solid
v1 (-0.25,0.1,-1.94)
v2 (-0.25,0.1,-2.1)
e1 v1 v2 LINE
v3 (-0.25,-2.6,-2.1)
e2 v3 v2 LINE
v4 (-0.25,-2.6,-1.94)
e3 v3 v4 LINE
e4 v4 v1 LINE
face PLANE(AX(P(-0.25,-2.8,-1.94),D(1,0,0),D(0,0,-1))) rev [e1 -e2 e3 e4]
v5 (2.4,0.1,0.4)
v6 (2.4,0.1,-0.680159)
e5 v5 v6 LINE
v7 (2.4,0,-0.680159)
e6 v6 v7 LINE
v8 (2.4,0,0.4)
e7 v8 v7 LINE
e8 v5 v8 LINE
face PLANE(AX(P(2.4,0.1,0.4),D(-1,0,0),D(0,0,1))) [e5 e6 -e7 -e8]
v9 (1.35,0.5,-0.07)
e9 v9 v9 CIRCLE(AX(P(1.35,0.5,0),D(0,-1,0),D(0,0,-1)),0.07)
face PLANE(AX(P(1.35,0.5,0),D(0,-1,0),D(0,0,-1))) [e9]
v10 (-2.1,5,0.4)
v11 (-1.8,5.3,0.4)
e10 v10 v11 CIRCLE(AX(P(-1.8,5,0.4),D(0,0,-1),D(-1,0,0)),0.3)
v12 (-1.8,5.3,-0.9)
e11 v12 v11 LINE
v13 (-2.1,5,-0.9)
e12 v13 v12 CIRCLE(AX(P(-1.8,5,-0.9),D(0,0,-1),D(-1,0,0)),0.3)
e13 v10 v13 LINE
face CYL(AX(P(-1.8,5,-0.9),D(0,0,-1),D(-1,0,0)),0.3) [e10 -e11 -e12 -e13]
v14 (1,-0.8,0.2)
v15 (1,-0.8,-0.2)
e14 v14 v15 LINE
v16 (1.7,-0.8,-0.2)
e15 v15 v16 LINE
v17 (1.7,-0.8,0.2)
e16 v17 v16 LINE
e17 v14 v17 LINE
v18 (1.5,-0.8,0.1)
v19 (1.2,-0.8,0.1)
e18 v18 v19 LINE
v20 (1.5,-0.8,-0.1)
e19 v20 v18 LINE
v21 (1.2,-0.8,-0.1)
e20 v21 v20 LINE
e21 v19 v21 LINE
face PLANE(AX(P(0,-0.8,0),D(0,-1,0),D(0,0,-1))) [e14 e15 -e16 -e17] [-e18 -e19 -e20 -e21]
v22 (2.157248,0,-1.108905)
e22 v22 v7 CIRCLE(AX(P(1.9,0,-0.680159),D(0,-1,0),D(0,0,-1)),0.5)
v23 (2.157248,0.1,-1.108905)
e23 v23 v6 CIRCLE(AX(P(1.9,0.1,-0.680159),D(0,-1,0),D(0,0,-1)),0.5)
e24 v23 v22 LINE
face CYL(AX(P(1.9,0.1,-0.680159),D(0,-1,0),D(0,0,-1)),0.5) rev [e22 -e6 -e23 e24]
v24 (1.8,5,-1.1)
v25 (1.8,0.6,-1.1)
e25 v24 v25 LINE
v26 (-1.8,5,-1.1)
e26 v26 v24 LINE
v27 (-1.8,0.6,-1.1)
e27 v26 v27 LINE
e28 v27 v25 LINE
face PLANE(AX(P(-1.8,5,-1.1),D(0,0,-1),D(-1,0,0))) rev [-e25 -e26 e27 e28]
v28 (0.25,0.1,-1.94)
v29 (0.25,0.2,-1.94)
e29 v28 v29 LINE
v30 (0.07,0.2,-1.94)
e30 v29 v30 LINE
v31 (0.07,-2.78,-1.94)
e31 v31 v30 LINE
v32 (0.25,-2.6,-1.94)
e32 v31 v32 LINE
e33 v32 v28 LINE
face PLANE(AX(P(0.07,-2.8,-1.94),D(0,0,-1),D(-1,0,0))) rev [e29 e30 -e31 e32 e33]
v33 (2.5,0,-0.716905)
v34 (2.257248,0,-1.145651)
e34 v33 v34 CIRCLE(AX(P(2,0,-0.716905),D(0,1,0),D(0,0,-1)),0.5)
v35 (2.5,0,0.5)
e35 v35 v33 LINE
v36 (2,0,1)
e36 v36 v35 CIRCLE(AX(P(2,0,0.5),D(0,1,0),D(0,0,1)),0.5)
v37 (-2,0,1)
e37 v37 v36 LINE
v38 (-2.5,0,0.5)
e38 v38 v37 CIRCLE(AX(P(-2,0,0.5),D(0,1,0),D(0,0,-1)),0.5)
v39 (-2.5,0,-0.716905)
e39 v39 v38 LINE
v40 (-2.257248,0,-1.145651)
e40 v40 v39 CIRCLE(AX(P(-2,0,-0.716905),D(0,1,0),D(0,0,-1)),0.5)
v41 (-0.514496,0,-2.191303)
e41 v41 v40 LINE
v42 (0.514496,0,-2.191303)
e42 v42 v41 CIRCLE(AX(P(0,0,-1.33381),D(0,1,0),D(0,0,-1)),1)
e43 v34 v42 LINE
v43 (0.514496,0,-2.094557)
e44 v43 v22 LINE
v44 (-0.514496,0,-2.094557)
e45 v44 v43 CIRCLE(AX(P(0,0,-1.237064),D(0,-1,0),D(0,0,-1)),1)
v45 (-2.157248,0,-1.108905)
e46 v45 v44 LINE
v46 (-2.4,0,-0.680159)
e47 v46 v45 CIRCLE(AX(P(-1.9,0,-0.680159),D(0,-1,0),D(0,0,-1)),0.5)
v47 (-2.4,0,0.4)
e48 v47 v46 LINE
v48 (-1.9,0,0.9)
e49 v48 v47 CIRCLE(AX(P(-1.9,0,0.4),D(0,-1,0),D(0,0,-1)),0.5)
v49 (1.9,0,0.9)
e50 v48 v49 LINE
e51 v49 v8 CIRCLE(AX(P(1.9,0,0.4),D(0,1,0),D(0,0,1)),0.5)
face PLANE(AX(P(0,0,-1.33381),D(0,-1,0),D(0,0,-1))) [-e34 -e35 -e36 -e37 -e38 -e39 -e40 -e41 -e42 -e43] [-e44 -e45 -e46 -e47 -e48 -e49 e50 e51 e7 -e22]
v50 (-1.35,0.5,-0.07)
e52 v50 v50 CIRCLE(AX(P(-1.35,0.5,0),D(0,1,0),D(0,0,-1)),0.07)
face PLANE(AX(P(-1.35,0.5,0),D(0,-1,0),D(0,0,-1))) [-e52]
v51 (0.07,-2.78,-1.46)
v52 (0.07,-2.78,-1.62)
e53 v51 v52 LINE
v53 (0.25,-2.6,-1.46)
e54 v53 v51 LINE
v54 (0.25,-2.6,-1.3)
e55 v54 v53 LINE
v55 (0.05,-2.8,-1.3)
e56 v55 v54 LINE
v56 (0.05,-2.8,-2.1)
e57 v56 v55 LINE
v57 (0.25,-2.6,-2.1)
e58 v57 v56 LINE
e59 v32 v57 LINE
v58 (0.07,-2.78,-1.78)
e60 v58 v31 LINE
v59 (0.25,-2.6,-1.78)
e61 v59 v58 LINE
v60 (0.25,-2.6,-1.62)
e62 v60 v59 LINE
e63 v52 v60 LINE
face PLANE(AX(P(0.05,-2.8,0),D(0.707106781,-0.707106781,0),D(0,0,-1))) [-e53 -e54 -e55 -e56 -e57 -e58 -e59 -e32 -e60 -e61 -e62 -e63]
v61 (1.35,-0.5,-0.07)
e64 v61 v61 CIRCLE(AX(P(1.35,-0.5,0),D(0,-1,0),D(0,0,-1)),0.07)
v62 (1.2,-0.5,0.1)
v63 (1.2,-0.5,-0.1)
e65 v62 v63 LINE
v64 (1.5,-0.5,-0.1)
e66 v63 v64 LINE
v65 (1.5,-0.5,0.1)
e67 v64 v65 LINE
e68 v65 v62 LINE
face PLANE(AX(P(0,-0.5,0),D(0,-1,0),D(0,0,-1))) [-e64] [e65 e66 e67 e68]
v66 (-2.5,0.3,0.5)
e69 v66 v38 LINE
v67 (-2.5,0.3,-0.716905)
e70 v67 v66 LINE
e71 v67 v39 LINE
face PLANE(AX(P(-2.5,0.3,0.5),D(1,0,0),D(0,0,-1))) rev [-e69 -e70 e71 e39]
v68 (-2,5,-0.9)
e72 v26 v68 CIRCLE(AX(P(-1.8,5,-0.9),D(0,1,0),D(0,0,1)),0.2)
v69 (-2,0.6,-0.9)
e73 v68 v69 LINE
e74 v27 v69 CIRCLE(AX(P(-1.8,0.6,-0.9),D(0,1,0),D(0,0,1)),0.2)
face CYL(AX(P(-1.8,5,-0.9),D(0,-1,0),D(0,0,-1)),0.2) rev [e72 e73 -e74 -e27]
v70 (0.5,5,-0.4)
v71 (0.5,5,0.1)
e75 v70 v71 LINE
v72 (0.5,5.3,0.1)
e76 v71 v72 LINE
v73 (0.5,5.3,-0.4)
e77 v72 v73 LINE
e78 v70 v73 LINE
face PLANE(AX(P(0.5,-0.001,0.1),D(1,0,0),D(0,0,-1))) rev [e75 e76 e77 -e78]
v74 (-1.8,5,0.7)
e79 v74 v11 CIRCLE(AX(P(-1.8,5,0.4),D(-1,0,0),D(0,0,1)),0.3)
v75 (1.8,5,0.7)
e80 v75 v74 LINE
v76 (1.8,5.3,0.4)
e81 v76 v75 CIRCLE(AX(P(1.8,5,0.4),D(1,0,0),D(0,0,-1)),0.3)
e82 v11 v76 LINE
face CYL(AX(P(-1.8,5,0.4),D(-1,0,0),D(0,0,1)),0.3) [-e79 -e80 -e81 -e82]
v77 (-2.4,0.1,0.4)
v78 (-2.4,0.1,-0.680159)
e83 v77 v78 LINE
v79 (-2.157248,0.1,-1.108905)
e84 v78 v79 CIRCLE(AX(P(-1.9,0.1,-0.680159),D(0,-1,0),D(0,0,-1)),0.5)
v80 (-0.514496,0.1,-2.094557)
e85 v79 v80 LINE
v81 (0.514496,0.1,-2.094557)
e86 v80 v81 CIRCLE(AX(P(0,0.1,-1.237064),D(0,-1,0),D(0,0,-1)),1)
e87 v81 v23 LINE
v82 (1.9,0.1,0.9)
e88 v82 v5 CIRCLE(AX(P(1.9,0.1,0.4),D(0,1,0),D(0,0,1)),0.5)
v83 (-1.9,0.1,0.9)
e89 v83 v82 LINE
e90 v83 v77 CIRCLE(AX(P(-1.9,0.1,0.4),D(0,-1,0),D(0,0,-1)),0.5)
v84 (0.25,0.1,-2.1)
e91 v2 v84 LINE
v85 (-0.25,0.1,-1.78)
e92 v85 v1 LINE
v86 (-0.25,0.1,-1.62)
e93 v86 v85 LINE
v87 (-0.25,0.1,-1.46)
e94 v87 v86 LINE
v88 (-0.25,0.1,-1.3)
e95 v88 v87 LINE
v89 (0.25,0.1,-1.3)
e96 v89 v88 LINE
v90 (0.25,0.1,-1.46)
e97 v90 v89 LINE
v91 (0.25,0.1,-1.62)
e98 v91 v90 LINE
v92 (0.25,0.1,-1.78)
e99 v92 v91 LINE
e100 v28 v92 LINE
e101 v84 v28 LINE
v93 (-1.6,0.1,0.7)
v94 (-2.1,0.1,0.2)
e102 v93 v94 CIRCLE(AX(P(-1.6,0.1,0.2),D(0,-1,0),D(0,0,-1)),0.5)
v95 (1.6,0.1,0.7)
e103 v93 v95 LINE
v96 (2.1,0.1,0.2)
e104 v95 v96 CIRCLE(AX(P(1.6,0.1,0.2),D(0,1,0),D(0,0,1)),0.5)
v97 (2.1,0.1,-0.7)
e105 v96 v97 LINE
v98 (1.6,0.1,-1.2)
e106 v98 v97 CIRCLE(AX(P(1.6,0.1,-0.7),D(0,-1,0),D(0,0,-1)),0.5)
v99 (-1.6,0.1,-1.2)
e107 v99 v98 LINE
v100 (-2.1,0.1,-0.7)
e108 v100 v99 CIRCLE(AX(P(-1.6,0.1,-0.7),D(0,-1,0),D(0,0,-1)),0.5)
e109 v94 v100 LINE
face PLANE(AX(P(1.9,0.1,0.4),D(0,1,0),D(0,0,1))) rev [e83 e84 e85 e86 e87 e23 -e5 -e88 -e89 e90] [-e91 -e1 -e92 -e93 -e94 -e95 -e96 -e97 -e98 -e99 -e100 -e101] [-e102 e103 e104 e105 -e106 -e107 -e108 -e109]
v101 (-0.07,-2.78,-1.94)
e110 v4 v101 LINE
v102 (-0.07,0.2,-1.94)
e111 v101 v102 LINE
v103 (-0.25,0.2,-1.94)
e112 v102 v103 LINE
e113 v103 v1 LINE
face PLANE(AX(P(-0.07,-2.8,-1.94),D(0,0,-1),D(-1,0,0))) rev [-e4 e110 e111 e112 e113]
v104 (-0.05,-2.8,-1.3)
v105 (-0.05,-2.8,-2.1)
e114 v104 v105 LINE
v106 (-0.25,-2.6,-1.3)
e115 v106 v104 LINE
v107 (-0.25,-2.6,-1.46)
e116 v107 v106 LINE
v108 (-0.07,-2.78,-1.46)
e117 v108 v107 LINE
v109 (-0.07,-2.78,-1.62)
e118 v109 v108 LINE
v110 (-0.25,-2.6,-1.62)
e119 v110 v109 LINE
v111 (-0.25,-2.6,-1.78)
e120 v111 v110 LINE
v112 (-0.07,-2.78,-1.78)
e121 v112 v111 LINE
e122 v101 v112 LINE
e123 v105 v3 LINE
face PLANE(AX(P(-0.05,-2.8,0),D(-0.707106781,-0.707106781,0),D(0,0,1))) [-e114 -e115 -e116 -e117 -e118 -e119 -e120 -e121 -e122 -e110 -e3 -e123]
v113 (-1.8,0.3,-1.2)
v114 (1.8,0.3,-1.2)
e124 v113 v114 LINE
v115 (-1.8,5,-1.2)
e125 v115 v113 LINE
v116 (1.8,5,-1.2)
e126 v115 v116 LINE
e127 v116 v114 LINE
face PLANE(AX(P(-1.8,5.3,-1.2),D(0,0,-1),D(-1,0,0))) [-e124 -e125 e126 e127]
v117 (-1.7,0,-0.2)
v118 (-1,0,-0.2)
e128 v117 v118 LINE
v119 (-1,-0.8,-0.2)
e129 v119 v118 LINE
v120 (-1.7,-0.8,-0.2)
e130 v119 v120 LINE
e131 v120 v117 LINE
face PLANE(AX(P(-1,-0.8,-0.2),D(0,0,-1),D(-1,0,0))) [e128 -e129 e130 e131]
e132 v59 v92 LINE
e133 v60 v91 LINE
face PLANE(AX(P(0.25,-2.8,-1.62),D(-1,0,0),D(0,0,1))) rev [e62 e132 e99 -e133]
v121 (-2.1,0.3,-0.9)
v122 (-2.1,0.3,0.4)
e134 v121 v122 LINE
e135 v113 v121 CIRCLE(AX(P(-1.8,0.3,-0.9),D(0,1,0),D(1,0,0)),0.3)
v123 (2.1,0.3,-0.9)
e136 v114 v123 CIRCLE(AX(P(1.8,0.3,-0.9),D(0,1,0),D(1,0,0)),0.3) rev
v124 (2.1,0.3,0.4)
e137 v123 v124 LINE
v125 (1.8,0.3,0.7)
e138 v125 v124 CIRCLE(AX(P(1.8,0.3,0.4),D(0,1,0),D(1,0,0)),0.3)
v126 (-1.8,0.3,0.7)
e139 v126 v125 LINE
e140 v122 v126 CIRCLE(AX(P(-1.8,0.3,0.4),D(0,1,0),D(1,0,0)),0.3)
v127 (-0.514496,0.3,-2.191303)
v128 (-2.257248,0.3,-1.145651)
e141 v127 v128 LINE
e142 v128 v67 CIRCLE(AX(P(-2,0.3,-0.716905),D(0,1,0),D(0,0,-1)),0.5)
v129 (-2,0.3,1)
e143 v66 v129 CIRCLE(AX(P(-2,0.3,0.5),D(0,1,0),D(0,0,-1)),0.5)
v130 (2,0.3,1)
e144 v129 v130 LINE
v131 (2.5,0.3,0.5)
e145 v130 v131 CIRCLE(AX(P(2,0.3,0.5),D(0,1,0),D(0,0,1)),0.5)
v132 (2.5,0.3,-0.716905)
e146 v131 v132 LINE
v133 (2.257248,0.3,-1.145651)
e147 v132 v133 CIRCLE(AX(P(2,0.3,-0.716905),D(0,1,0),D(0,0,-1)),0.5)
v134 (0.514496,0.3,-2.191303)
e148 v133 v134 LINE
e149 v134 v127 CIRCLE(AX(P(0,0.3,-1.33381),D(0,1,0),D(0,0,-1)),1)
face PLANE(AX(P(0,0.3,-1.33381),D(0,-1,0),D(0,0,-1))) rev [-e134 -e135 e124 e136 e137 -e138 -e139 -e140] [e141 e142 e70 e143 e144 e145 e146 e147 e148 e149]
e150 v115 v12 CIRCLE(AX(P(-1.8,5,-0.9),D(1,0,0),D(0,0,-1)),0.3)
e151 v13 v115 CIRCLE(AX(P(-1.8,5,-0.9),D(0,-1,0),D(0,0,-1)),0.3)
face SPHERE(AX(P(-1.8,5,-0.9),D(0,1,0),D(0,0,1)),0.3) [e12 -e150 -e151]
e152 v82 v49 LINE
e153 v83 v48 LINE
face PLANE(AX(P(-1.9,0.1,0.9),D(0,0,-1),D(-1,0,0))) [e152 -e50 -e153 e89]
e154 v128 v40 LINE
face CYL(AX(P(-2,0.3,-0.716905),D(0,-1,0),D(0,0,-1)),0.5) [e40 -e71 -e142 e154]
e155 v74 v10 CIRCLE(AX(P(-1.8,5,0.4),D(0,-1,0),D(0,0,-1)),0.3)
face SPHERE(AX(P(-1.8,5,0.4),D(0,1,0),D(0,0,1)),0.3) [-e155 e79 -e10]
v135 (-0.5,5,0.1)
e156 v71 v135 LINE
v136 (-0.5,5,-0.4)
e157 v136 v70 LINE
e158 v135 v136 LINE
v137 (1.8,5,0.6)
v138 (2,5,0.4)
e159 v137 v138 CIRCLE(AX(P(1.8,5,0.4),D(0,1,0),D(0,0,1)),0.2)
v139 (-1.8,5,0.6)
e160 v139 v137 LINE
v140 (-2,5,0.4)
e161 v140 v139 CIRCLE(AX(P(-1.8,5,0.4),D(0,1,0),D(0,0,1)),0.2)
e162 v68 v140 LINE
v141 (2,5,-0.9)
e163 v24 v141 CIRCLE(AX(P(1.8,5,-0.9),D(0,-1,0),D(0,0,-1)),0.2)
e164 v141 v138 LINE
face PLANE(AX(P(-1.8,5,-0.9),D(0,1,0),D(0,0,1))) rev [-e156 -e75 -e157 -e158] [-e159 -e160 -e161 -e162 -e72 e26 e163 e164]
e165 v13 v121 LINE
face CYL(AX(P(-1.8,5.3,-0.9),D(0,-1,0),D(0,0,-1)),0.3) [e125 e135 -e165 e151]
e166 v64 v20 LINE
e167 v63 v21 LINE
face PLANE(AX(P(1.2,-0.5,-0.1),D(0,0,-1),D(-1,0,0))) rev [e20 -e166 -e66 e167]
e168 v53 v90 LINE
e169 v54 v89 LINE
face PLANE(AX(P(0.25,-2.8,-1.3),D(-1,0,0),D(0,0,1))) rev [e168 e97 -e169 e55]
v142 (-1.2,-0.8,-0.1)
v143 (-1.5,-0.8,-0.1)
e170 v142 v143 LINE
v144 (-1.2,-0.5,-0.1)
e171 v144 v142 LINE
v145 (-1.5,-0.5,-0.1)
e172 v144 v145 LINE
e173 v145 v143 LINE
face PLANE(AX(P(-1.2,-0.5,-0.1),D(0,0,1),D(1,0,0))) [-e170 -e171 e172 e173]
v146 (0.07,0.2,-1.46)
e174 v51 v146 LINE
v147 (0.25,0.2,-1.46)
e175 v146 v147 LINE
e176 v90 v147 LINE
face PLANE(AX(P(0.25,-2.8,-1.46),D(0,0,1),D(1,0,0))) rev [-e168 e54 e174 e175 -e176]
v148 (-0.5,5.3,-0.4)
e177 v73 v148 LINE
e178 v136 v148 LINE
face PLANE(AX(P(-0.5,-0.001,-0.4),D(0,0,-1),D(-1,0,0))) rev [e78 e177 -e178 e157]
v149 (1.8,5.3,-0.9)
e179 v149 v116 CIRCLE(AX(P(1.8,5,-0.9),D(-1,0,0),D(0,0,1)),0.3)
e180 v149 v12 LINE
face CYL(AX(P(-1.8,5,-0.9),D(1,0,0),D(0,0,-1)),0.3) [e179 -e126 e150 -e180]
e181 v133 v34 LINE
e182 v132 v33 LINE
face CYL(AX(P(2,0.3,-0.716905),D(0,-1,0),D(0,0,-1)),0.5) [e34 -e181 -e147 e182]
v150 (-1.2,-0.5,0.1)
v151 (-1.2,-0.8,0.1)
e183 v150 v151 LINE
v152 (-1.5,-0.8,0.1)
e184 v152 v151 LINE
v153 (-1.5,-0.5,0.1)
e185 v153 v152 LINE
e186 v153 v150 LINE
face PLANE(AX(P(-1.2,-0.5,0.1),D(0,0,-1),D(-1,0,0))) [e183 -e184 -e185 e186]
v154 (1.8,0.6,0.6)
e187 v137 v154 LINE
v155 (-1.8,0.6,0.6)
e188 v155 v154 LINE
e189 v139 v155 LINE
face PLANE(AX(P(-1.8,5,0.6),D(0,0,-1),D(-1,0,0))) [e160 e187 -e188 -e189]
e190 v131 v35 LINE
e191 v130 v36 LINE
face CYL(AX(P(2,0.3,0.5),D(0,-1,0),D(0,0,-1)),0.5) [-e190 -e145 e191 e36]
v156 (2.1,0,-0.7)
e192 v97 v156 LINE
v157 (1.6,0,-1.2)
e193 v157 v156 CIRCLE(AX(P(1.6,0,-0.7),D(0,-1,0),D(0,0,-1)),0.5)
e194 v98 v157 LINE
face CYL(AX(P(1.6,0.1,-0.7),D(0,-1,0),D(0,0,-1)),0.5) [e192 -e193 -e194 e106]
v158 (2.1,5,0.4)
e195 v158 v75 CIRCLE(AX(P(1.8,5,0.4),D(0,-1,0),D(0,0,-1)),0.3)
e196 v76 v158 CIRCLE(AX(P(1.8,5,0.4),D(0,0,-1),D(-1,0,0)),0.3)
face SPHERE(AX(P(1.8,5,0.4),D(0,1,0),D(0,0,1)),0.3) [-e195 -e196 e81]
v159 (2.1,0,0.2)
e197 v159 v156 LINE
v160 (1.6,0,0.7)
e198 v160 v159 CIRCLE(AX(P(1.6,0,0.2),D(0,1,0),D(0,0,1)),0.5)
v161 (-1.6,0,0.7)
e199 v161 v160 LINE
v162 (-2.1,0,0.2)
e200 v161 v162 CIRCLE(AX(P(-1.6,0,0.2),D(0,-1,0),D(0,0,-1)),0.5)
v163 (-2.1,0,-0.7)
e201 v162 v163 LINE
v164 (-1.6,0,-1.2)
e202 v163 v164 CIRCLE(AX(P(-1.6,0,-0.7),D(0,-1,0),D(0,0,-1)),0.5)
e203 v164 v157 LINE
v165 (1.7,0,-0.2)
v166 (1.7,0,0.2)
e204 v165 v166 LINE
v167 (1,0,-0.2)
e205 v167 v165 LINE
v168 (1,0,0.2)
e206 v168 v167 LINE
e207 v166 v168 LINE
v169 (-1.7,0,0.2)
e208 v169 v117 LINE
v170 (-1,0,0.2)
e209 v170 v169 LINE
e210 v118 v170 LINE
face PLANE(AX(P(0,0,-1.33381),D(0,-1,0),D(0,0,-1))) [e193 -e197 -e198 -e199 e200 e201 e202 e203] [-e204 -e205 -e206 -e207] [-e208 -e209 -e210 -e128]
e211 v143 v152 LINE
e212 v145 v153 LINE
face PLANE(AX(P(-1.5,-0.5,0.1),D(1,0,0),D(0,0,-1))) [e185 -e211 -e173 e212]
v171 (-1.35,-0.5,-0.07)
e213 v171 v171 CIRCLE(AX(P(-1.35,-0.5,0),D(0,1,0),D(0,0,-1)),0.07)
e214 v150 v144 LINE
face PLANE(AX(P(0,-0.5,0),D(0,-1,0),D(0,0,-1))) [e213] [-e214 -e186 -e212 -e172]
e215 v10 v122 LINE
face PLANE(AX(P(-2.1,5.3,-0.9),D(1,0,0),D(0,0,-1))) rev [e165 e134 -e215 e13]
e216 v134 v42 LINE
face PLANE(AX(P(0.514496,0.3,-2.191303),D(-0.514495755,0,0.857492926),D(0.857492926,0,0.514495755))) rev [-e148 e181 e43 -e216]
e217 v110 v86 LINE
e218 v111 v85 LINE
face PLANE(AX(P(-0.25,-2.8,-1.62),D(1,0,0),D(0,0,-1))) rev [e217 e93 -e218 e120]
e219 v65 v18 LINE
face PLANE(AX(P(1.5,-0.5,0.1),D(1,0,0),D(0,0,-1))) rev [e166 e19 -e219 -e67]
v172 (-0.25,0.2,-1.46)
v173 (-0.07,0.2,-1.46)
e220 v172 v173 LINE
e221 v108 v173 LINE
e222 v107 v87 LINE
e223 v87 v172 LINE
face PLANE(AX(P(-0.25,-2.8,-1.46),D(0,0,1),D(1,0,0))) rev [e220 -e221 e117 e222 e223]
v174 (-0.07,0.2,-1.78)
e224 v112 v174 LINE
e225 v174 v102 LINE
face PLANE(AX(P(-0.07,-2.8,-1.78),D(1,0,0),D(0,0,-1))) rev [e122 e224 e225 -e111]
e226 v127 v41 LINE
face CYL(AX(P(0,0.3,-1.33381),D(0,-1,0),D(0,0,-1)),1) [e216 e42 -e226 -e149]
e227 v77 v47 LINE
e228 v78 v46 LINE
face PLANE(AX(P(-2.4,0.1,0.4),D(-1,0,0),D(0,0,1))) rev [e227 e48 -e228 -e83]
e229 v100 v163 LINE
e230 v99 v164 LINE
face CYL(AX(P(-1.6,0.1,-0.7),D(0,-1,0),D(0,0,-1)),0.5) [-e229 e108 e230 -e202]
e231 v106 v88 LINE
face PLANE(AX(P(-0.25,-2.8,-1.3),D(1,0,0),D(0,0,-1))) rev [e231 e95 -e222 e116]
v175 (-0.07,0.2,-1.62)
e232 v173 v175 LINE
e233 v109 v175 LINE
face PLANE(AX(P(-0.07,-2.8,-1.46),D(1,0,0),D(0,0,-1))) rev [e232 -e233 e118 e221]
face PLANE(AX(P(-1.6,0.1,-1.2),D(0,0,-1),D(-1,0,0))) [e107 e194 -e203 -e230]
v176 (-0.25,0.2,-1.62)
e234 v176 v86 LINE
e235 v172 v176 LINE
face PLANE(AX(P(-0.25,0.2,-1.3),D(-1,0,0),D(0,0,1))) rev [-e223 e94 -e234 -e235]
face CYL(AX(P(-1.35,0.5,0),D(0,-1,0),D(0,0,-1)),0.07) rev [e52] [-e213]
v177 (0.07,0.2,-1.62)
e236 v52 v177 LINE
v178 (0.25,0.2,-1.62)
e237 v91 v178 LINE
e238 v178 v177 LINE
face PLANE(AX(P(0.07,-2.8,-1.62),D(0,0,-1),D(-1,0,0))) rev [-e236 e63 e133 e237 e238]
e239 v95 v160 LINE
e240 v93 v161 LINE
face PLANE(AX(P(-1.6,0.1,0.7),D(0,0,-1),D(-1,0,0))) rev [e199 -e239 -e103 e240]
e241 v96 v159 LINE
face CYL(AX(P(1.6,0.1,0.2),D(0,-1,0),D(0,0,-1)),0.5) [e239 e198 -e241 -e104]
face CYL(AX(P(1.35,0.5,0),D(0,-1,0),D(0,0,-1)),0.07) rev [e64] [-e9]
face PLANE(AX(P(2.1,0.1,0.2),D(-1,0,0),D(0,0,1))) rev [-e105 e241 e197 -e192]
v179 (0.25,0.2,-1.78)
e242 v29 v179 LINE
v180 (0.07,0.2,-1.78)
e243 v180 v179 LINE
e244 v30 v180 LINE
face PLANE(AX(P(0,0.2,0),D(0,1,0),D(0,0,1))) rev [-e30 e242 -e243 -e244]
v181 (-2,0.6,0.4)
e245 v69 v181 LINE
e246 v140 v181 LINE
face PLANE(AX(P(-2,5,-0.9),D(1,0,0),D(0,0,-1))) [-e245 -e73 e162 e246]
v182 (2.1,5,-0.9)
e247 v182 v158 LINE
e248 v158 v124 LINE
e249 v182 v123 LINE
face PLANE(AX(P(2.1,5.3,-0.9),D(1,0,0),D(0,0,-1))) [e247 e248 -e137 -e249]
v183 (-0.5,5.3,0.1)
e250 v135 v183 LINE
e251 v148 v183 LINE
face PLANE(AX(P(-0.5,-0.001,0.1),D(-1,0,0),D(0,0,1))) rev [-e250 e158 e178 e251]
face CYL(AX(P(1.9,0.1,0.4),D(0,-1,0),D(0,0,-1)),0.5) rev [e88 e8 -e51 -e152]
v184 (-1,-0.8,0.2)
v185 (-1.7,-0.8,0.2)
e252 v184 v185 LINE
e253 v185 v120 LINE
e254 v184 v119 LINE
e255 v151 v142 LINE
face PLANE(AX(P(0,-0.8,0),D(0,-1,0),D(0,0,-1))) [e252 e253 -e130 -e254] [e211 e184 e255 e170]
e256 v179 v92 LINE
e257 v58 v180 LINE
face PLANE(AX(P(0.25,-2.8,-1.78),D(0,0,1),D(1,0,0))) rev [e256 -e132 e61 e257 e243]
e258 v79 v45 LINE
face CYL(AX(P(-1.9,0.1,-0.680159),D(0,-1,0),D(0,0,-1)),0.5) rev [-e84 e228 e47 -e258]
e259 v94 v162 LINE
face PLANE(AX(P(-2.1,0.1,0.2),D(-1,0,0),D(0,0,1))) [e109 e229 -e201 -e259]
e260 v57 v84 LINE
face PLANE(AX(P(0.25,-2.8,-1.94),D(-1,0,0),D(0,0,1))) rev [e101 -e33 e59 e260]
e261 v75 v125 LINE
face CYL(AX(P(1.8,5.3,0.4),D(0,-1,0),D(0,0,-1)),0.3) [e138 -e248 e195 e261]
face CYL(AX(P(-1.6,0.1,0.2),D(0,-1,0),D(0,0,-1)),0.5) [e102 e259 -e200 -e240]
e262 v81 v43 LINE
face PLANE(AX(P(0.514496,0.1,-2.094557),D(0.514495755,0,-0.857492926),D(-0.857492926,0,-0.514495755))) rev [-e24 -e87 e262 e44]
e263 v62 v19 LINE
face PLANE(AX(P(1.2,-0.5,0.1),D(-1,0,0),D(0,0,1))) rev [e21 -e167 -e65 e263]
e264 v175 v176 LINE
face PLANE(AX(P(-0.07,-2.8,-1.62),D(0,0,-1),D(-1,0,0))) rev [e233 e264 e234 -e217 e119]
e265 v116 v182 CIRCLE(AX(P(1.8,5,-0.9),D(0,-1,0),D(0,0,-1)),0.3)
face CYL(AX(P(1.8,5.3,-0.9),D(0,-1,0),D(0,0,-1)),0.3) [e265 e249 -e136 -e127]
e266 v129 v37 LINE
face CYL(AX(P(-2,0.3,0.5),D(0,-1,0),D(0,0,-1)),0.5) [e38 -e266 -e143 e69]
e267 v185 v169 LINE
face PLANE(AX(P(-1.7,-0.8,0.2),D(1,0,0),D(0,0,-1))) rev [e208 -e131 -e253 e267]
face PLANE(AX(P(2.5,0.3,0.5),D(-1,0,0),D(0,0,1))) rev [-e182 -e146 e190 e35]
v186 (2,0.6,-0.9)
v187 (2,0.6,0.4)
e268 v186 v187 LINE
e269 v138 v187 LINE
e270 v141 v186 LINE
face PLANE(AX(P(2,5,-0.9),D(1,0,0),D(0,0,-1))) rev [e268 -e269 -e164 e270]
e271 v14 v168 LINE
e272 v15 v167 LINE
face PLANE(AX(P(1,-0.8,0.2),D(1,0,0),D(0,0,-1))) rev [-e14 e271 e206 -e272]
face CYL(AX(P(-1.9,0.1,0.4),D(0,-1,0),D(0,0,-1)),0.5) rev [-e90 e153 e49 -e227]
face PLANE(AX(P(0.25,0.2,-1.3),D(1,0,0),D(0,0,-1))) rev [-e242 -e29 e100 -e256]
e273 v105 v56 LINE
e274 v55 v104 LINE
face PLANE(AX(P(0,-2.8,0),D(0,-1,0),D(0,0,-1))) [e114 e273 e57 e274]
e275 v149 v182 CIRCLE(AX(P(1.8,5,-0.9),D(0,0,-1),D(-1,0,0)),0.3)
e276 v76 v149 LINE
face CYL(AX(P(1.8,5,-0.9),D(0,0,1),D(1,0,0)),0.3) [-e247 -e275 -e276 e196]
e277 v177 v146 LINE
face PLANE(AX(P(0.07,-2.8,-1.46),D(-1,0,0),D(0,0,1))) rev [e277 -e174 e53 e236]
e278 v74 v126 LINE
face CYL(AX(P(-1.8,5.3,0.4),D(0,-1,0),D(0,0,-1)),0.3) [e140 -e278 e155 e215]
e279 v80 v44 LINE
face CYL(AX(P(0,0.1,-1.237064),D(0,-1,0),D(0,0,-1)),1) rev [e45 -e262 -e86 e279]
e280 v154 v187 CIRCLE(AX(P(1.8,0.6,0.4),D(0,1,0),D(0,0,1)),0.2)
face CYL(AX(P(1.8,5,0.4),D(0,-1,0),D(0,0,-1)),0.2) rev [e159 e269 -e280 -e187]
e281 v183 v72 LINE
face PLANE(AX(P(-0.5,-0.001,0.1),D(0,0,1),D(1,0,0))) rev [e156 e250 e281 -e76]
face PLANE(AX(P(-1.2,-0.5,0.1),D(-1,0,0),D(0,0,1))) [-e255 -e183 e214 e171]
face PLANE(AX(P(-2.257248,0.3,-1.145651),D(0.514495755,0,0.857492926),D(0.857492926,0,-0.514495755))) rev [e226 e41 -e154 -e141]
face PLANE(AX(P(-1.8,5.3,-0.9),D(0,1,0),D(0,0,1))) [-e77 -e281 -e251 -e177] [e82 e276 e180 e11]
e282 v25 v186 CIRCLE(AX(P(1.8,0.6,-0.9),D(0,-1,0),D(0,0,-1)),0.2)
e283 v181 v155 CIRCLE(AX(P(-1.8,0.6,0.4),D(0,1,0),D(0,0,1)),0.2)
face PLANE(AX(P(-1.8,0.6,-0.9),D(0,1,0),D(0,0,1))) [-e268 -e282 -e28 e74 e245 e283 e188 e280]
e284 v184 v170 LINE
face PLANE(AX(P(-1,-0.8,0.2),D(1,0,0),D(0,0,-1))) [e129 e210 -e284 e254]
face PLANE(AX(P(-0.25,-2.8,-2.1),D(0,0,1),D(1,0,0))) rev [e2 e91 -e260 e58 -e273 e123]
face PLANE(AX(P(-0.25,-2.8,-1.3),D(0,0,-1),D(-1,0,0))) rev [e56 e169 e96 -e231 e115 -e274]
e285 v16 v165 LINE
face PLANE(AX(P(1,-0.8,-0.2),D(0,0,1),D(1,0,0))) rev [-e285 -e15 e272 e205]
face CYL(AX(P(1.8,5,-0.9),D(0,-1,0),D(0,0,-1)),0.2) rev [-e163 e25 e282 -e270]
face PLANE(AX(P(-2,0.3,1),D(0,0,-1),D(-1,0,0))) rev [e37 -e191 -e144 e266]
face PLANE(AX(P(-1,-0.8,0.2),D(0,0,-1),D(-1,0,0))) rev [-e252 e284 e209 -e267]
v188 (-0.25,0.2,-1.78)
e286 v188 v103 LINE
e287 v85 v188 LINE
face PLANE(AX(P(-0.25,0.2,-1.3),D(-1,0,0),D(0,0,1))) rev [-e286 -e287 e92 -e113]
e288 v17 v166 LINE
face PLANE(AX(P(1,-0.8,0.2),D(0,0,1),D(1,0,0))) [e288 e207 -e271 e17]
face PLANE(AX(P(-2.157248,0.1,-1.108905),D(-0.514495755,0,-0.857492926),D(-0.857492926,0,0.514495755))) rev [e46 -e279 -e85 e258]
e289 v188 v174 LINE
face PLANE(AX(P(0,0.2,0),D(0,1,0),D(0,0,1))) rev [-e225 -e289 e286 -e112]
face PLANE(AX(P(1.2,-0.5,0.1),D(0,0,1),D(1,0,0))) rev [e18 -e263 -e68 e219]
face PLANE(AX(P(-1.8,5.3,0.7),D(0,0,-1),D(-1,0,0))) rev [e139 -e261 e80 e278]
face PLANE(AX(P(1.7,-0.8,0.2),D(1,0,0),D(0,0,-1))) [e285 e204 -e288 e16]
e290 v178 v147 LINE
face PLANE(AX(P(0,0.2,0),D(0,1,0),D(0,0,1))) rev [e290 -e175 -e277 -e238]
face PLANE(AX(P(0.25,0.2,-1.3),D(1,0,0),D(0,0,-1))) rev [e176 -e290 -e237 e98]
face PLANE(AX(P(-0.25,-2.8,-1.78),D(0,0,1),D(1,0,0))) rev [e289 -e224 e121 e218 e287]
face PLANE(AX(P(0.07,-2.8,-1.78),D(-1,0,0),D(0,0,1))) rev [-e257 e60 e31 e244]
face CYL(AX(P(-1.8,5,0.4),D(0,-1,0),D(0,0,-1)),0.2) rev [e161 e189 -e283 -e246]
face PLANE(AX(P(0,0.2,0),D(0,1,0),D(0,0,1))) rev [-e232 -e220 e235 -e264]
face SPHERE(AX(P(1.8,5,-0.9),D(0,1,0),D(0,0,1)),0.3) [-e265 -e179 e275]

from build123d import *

# Parameters (mm, degrees)
BOSS_EXTRUDE1_DEPTH   = 0.3
EXTRUDE_THIN1_DEPTH   = 5
EXTRUDE_THIN1_2_DEPTH = 0.3
EXTRUDE_THIN1_START   = 4.7
EXTRUDE_THIN1_3_DEPTH = 0.3
FILLET2_R             = 0.3
CUT_EXTRUDE2_REACH    = 8.308
SKETCH5_W             = 1
SKETCH5_H             = 0.5
SKETCH6_W             = 0.7
SKETCH6_H             = 0.4
SKETCH6_W_2           = 0.5
SKETCH6_H_2           = 0.8
CUT_EXTRUDE3_DEPTH    = 0.2
CUT_EXTRUDE4_DEPTH    = 0.1
BOSS_EXTRUDE2_DEPTH   = 3
CHAMFER1_SIZE         = 0.2
SKETCH9_W             = 0.7
SKETCH9_H             = 0.4
BOSS_EXTRUDE3_DEPTH   = 1
SKETCH10_W            = 0.3
SKETCH10_H            = 0.2
CUT_EXTRUDE5_DEPTH    = 0.3
SKETCH11_R            = 0.07
CUT_EXTRUDE6_DEPTH    = 1


# Read off the part's stored shape, not the designer's step: Extrude-Thin1
with BuildPart() as part:
    # Sketch2 → Boss-Extrude1 (new body)
    with BuildSketch(Plane(origin=(0, 0, 0), x_dir=(1, 0, 0), z_dir=(0, 1, 0))):
        with BuildLine():
            Line((-2.257247878, 1.145651273), (-0.514495755, 2.191302547))
            ThreePointArc((-0.514495755, 2.191302547), (0, 2.333809621), (0.514495755, 2.191302547))
            Line((0.514495755, 2.191302547), (2.257247878, 1.145651273))
            ThreePointArc((2.257247878, 1.145651273), (2.435099953, 0.963254218), (2.5, 0.716904811))
            Line((2.5, 0.716904811), (2.5, -0.5))
            ThreePointArc((2.5, -0.5), (2.353553391, -0.853553391), (2, -1))
            Line((2, -1), (-2, -1))
            ThreePointArc((-2, -1), (-2.353553391, -0.853553391), (-2.5, -0.5))
            Line((-2.5, -0.5), (-2.5, 0.716904811))
            ThreePointArc((-2.5, 0.716904811), (-2.435099953, 0.963254218), (-2.257247878, 1.145651273))
        make_face()
    extrude(amount=BOSS_EXTRUDE1_DEPTH)

    # Extrude-Thin1 outline → Extrude-Thin1 (add)
    with BuildSketch(Plane(origin=(0, 0.3, 0), x_dir=(1, 0, 0), z_dir=(0, 1, 0))):
        with BuildLine():
            ThreePointArc((-1.8, 1.2), (-2.012132034, 1.112132034), (-2.1, 0.9))
            Line((-2.1, 0.9), (-2.1, -0.4))
            ThreePointArc((-2.1, -0.4), (-2.012132034, -0.612132034), (-1.8, -0.7))
            Line((-1.8, -0.7), (1.8, -0.7))
            ThreePointArc((1.8, -0.7), (2.012132034, -0.612132034), (2.1, -0.4))
            Line((2.1, -0.4), (2.1, 0.9))
            ThreePointArc((2.1, 0.9), (2.012132034, 1.112132034), (1.8, 1.2))
            Line((1.8, 1.2), (-1.8, 1.2))
        make_face()
        with BuildLine():
            Line((-2, -0.4), (-2, 0.9))
            ThreePointArc((-2, 0.9), (-1.941421356, 1.041421356), (-1.8, 1.1))
            Line((-1.8, 1.1), (1.8, 1.1))
            ThreePointArc((1.8, 1.1), (1.941421356, 1.041421356), (2, 0.9))
            Line((2, 0.9), (2, -0.4))
            ThreePointArc((2, -0.4), (1.941421356, -0.541421356), (1.8, -0.6))
            Line((1.8, -0.6), (-1.8, -0.6))
            ThreePointArc((-1.8, -0.6), (-1.941421356, -0.541421356), (-2, -0.4))
        make_face(mode=Mode.SUBTRACT)
    extrude(amount=EXTRUDE_THIN1_DEPTH)

    # Extrude-Thin1 2 outline → Extrude-Thin1 2 (add)
    with BuildSketch(Plane(origin=(0, 0.3, 0), x_dir=(1, 0, 0), z_dir=(0, 1, 0))):
        with BuildLine():
            ThreePointArc((-1.8, 1.1), (-1.941421356, 1.041421356), (-2, 0.9))
            Line((-2, 0.9), (-2, -0.4))
            ThreePointArc((-2, -0.4), (-1.941421356, -0.541421356), (-1.8, -0.6))
            Line((-1.8, -0.6), (1.8, -0.6))
            ThreePointArc((1.8, -0.6), (1.941421356, -0.541421356), (2, -0.4))
            Line((2, -0.4), (2, 0.9))
            ThreePointArc((2, 0.9), (1.941421356, 1.041421356), (1.8, 1.1))
            Line((1.8, 1.1), (-1.8, 1.1))
        make_face()
    extrude(amount=EXTRUDE_THIN1_2_DEPTH)

    # Extrude-Thin1 3 outline → Extrude-Thin1 3 (add)
    with BuildSketch(Plane(origin=(0, 0.3, 0), x_dir=(1, 0, 0), z_dir=(0, 1, 0)).offset(EXTRUDE_THIN1_START)):
        with BuildLine():
            ThreePointArc((-1.8, 1.1), (-1.941421356, 1.041421356), (-2, 0.9))
            Line((-2, 0.9), (-2, -0.4))
            ThreePointArc((-2, -0.4), (-1.941421356, -0.541421356), (-1.8, -0.6))
            Line((-1.8, -0.6), (1.8, -0.6))
            ThreePointArc((1.8, -0.6), (1.941421356, -0.541421356), (2, -0.4))
            Line((2, -0.4), (2, 0.9))
            ThreePointArc((2, 0.9), (1.941421356, 1.041421356), (1.8, 1.1))
            Line((1.8, 1.1), (-1.8, 1.1))
        make_face()
    extrude(amount=EXTRUDE_THIN1_3_DEPTH)

    # Fillet2
    fillet2_edges = [part.edges().sort_by_distance(p)[0] for p in [
        (2.1, 5.3, -0.25),
        (2.012132034, 5.3, -1.112132034),
        (0, 5.3, -1.2),
        (-2.012132034, 5.3, -1.112132034),
        (-2.1, 5.3, -0.25),
        (-2.012132034, 5.3, 0.612132034),
        (0, 5.3, 0.7),
        (2.012132034, 5.3, 0.612132034),
    ]]
    fillet(fillet2_edges, radius=FILLET2_R)

    # Sketch5 → Cut-Extrude2 (cut, up to next)
    with BuildSketch(Plane(origin=(0, 5.3, 0), x_dir=(1, 0, 0), z_dir=(0, 1, 0)), mode=Mode.PRIVATE) as cut_extrude2_sk1:
        with Locations((0, 0.15)):
            Rectangle(SKETCH5_W, SKETCH5_H)
    cut_extrude2_tool1 = extrude(cut_extrude2_sk1.sketch, amount=-CUT_EXTRUDE2_REACH, mode=Mode.PRIVATE) & part.part
    add(cut_extrude2_tool1.solids().sort_by_distance((0, 5.3, -0.15))[0], mode=Mode.SUBTRACT)

    # Sketch6 → Cut-Extrude3 (cut)
    with BuildSketch(Plane.XZ):
        with Locations((-1.35, 0)):
            Rectangle(SKETCH6_W, SKETCH6_H)
        with Locations((1.35, 0)):
            Rectangle(SKETCH6_W, SKETCH6_H)
        with Locations((0, -1.7)):
            Rectangle(SKETCH6_W_2, SKETCH6_H_2)
    extrude(amount=-CUT_EXTRUDE3_DEPTH, mode=Mode.SUBTRACT)

    # Sketch7 → Cut-Extrude4 (cut)
    with BuildSketch(Plane.XZ):
        with BuildLine():
            Line((-1.9, 0.9), (1.9, 0.9))
            ThreePointArc((1.9, 0.9), (2.253553391, 0.753553391), (2.4, 0.4))
            Line((2.4, 0.4), (2.4, -0.680159029))
            ThreePointArc((2.4, -0.680159029), (2.335099953, -0.926508436), (2.157247878, -1.108905491))
            Line((2.157247878, -1.108905491), (0.514495755, -2.094556765))
            ThreePointArc((0.514495755, -2.094556765), (0, -2.237063839), (-0.514495755, -2.094556765))
            Line((-0.514495755, -2.094556765), (-2.157247878, -1.108905491))
            ThreePointArc((-2.157247878, -1.108905491), (-2.335099953, -0.926508436), (-2.4, -0.680159029))
            Line((-2.4, -0.680159029), (-2.4, 0.4))
            ThreePointArc((-2.4, 0.4), (-2.253553391, 0.753553391), (-1.9, 0.9))
        make_face()
        with BuildLine():
            Line((-1.6, 0.7), (1.6, 0.7))
            ThreePointArc((1.6, 0.7), (1.953553391, 0.553553391), (2.1, 0.2))
            Line((2.1, 0.2), (2.1, -0.7))
            ThreePointArc((2.1, -0.7), (1.953553391, -1.053553391), (1.6, -1.2))
            Line((1.6, -1.2), (-1.6, -1.2))
            ThreePointArc((-1.6, -1.2), (-1.953553391, -1.053553391), (-2.1, -0.7))
            Line((-2.1, -0.7), (-2.1, 0.2))
            ThreePointArc((-2.1, 0.2), (-1.953553391, 0.553553391), (-1.6, 0.7))
        make_face(mode=Mode.SUBTRACT)
    extrude(amount=-CUT_EXTRUDE4_DEPTH, mode=Mode.SUBTRACT)

    # Sketch8 → Boss-Extrude2 (add)
    with BuildSketch(Plane.XZ.offset(-0.2)):
        Polygon((0.25, -1.46), (0.07, -1.46), (0.07, -1.62), (0.25, -1.62), (0.25, -1.78), (0.07, -1.78), (0.07, -1.94), (0.25, -1.94), (0.25, -2.1), (-0.25, -2.1), (-0.25, -1.94), (-0.07, -1.94), (-0.07, -1.78), (-0.25, -1.78), (-0.25, -1.62), (-0.07, -1.62), (-0.07, -1.46), (-0.25, -1.46), (-0.25, -1.3), (0.25, -1.3), align=None)
    extrude(amount=BOSS_EXTRUDE2_DEPTH)

    # Chamfer1
    # the kernel refuses this chamfer: 0.2 mm, written as the material it takes off along each edge
    with BuildSketch(Plane(origin=(-0.25, -2.8, -1.974336598), x_dir=(-0.027495876610586223, 0.9996219169112966, 0), z_dir=(0, 0, 1)), Plane(origin=(-0.25, -2.8, -2.294336598), x_dir=(-0.027495876610586223, 0.9996219169112966, 0), z_dir=(0, 0, 1)), Plane(origin=(-0.25, -2.8, -2.614336598), x_dir=(-0.027495876610586355, 0.9996219169112966, 0), z_dir=(0, 0, 1)), Plane(origin=(0.25, -2.8, -1.425663402), x_dir=(0.027495876610586223, 0.9996219169112966, 0), z_dir=(0, 0, -1)), Plane(origin=(0.25, -2.8, -1.105663402), x_dir=(0.027495876610586223, 0.9996219169112966, 0), z_dir=(0, 0, -1)), Plane(origin=(0.25, -2.8, -0.785663402), x_dir=(0.027495876610586223, 0.9996219169112966, 0), z_dir=(0, 0, -1))) as chamfer1_piece_1:
        Polygon((CHAMFER1_SIZE * 0.999621916911, -CHAMFER1_SIZE * 0.0274958766106), (-CHAMFER1_SIZE * 0.0274958766106, -CHAMFER1_SIZE * 0.999621916911), (0, 0), align=None)
    extrude(amount=1.188673195, mode=Mode.SUBTRACT)

    # Sketch9 → Boss-Extrude3 (add)
    with BuildSketch(Plane.XZ.offset(-0.2)):
        with Locations((1.35, 0)):
            Rectangle(SKETCH9_W, SKETCH9_H)
    boss_extrude3 = extrude(amount=BOSS_EXTRUDE3_DEPTH)

    # Sketch10 → Cut-Extrude5 (cut)
    with BuildSketch(Plane.XZ.offset(0.8)):
        with Locations((1.35, 0)):
            Rectangle(SKETCH10_W, SKETCH10_H)
        with Locations((-1.35, 0)):
            Rectangle(SKETCH10_W, SKETCH10_H)
    cut_extrude5 = extrude(amount=-CUT_EXTRUDE5_DEPTH, mode=Mode.SUBTRACT)

    # Sketch11 → Cut-Extrude6 (cut)
    with BuildSketch(Plane.XZ.offset(0.5)):
        with Locations(Location((1.35, 0, 0), (0, 0, 270))):
            Circle(SKETCH11_R)
    cut_extrude6 = extrude(amount=-CUT_EXTRUDE6_DEPTH, mode=Mode.SUBTRACT)

    # Mirror2: Boss-Extrude3, Cut-Extrude5, Cut-Extrude6 across plane
    add(boss_extrude3.mirror(Plane(origin=(0, 0, 0), x_dir=(0, 0, 1), z_dir=(1, 0, 0))))
    add(cut_extrude5.mirror(Plane(origin=(0, 0, 0), x_dir=(0, 0, 1), z_dir=(1, 0, 0))), mode=Mode.SUBTRACT)
    add(cut_extrude6.mirror(Plane(origin=(0, 0, 0), x_dir=(0, 0, 1), z_dir=(1, 0, 0))), mode=Mode.SUBTRACT)


solid = part.part
